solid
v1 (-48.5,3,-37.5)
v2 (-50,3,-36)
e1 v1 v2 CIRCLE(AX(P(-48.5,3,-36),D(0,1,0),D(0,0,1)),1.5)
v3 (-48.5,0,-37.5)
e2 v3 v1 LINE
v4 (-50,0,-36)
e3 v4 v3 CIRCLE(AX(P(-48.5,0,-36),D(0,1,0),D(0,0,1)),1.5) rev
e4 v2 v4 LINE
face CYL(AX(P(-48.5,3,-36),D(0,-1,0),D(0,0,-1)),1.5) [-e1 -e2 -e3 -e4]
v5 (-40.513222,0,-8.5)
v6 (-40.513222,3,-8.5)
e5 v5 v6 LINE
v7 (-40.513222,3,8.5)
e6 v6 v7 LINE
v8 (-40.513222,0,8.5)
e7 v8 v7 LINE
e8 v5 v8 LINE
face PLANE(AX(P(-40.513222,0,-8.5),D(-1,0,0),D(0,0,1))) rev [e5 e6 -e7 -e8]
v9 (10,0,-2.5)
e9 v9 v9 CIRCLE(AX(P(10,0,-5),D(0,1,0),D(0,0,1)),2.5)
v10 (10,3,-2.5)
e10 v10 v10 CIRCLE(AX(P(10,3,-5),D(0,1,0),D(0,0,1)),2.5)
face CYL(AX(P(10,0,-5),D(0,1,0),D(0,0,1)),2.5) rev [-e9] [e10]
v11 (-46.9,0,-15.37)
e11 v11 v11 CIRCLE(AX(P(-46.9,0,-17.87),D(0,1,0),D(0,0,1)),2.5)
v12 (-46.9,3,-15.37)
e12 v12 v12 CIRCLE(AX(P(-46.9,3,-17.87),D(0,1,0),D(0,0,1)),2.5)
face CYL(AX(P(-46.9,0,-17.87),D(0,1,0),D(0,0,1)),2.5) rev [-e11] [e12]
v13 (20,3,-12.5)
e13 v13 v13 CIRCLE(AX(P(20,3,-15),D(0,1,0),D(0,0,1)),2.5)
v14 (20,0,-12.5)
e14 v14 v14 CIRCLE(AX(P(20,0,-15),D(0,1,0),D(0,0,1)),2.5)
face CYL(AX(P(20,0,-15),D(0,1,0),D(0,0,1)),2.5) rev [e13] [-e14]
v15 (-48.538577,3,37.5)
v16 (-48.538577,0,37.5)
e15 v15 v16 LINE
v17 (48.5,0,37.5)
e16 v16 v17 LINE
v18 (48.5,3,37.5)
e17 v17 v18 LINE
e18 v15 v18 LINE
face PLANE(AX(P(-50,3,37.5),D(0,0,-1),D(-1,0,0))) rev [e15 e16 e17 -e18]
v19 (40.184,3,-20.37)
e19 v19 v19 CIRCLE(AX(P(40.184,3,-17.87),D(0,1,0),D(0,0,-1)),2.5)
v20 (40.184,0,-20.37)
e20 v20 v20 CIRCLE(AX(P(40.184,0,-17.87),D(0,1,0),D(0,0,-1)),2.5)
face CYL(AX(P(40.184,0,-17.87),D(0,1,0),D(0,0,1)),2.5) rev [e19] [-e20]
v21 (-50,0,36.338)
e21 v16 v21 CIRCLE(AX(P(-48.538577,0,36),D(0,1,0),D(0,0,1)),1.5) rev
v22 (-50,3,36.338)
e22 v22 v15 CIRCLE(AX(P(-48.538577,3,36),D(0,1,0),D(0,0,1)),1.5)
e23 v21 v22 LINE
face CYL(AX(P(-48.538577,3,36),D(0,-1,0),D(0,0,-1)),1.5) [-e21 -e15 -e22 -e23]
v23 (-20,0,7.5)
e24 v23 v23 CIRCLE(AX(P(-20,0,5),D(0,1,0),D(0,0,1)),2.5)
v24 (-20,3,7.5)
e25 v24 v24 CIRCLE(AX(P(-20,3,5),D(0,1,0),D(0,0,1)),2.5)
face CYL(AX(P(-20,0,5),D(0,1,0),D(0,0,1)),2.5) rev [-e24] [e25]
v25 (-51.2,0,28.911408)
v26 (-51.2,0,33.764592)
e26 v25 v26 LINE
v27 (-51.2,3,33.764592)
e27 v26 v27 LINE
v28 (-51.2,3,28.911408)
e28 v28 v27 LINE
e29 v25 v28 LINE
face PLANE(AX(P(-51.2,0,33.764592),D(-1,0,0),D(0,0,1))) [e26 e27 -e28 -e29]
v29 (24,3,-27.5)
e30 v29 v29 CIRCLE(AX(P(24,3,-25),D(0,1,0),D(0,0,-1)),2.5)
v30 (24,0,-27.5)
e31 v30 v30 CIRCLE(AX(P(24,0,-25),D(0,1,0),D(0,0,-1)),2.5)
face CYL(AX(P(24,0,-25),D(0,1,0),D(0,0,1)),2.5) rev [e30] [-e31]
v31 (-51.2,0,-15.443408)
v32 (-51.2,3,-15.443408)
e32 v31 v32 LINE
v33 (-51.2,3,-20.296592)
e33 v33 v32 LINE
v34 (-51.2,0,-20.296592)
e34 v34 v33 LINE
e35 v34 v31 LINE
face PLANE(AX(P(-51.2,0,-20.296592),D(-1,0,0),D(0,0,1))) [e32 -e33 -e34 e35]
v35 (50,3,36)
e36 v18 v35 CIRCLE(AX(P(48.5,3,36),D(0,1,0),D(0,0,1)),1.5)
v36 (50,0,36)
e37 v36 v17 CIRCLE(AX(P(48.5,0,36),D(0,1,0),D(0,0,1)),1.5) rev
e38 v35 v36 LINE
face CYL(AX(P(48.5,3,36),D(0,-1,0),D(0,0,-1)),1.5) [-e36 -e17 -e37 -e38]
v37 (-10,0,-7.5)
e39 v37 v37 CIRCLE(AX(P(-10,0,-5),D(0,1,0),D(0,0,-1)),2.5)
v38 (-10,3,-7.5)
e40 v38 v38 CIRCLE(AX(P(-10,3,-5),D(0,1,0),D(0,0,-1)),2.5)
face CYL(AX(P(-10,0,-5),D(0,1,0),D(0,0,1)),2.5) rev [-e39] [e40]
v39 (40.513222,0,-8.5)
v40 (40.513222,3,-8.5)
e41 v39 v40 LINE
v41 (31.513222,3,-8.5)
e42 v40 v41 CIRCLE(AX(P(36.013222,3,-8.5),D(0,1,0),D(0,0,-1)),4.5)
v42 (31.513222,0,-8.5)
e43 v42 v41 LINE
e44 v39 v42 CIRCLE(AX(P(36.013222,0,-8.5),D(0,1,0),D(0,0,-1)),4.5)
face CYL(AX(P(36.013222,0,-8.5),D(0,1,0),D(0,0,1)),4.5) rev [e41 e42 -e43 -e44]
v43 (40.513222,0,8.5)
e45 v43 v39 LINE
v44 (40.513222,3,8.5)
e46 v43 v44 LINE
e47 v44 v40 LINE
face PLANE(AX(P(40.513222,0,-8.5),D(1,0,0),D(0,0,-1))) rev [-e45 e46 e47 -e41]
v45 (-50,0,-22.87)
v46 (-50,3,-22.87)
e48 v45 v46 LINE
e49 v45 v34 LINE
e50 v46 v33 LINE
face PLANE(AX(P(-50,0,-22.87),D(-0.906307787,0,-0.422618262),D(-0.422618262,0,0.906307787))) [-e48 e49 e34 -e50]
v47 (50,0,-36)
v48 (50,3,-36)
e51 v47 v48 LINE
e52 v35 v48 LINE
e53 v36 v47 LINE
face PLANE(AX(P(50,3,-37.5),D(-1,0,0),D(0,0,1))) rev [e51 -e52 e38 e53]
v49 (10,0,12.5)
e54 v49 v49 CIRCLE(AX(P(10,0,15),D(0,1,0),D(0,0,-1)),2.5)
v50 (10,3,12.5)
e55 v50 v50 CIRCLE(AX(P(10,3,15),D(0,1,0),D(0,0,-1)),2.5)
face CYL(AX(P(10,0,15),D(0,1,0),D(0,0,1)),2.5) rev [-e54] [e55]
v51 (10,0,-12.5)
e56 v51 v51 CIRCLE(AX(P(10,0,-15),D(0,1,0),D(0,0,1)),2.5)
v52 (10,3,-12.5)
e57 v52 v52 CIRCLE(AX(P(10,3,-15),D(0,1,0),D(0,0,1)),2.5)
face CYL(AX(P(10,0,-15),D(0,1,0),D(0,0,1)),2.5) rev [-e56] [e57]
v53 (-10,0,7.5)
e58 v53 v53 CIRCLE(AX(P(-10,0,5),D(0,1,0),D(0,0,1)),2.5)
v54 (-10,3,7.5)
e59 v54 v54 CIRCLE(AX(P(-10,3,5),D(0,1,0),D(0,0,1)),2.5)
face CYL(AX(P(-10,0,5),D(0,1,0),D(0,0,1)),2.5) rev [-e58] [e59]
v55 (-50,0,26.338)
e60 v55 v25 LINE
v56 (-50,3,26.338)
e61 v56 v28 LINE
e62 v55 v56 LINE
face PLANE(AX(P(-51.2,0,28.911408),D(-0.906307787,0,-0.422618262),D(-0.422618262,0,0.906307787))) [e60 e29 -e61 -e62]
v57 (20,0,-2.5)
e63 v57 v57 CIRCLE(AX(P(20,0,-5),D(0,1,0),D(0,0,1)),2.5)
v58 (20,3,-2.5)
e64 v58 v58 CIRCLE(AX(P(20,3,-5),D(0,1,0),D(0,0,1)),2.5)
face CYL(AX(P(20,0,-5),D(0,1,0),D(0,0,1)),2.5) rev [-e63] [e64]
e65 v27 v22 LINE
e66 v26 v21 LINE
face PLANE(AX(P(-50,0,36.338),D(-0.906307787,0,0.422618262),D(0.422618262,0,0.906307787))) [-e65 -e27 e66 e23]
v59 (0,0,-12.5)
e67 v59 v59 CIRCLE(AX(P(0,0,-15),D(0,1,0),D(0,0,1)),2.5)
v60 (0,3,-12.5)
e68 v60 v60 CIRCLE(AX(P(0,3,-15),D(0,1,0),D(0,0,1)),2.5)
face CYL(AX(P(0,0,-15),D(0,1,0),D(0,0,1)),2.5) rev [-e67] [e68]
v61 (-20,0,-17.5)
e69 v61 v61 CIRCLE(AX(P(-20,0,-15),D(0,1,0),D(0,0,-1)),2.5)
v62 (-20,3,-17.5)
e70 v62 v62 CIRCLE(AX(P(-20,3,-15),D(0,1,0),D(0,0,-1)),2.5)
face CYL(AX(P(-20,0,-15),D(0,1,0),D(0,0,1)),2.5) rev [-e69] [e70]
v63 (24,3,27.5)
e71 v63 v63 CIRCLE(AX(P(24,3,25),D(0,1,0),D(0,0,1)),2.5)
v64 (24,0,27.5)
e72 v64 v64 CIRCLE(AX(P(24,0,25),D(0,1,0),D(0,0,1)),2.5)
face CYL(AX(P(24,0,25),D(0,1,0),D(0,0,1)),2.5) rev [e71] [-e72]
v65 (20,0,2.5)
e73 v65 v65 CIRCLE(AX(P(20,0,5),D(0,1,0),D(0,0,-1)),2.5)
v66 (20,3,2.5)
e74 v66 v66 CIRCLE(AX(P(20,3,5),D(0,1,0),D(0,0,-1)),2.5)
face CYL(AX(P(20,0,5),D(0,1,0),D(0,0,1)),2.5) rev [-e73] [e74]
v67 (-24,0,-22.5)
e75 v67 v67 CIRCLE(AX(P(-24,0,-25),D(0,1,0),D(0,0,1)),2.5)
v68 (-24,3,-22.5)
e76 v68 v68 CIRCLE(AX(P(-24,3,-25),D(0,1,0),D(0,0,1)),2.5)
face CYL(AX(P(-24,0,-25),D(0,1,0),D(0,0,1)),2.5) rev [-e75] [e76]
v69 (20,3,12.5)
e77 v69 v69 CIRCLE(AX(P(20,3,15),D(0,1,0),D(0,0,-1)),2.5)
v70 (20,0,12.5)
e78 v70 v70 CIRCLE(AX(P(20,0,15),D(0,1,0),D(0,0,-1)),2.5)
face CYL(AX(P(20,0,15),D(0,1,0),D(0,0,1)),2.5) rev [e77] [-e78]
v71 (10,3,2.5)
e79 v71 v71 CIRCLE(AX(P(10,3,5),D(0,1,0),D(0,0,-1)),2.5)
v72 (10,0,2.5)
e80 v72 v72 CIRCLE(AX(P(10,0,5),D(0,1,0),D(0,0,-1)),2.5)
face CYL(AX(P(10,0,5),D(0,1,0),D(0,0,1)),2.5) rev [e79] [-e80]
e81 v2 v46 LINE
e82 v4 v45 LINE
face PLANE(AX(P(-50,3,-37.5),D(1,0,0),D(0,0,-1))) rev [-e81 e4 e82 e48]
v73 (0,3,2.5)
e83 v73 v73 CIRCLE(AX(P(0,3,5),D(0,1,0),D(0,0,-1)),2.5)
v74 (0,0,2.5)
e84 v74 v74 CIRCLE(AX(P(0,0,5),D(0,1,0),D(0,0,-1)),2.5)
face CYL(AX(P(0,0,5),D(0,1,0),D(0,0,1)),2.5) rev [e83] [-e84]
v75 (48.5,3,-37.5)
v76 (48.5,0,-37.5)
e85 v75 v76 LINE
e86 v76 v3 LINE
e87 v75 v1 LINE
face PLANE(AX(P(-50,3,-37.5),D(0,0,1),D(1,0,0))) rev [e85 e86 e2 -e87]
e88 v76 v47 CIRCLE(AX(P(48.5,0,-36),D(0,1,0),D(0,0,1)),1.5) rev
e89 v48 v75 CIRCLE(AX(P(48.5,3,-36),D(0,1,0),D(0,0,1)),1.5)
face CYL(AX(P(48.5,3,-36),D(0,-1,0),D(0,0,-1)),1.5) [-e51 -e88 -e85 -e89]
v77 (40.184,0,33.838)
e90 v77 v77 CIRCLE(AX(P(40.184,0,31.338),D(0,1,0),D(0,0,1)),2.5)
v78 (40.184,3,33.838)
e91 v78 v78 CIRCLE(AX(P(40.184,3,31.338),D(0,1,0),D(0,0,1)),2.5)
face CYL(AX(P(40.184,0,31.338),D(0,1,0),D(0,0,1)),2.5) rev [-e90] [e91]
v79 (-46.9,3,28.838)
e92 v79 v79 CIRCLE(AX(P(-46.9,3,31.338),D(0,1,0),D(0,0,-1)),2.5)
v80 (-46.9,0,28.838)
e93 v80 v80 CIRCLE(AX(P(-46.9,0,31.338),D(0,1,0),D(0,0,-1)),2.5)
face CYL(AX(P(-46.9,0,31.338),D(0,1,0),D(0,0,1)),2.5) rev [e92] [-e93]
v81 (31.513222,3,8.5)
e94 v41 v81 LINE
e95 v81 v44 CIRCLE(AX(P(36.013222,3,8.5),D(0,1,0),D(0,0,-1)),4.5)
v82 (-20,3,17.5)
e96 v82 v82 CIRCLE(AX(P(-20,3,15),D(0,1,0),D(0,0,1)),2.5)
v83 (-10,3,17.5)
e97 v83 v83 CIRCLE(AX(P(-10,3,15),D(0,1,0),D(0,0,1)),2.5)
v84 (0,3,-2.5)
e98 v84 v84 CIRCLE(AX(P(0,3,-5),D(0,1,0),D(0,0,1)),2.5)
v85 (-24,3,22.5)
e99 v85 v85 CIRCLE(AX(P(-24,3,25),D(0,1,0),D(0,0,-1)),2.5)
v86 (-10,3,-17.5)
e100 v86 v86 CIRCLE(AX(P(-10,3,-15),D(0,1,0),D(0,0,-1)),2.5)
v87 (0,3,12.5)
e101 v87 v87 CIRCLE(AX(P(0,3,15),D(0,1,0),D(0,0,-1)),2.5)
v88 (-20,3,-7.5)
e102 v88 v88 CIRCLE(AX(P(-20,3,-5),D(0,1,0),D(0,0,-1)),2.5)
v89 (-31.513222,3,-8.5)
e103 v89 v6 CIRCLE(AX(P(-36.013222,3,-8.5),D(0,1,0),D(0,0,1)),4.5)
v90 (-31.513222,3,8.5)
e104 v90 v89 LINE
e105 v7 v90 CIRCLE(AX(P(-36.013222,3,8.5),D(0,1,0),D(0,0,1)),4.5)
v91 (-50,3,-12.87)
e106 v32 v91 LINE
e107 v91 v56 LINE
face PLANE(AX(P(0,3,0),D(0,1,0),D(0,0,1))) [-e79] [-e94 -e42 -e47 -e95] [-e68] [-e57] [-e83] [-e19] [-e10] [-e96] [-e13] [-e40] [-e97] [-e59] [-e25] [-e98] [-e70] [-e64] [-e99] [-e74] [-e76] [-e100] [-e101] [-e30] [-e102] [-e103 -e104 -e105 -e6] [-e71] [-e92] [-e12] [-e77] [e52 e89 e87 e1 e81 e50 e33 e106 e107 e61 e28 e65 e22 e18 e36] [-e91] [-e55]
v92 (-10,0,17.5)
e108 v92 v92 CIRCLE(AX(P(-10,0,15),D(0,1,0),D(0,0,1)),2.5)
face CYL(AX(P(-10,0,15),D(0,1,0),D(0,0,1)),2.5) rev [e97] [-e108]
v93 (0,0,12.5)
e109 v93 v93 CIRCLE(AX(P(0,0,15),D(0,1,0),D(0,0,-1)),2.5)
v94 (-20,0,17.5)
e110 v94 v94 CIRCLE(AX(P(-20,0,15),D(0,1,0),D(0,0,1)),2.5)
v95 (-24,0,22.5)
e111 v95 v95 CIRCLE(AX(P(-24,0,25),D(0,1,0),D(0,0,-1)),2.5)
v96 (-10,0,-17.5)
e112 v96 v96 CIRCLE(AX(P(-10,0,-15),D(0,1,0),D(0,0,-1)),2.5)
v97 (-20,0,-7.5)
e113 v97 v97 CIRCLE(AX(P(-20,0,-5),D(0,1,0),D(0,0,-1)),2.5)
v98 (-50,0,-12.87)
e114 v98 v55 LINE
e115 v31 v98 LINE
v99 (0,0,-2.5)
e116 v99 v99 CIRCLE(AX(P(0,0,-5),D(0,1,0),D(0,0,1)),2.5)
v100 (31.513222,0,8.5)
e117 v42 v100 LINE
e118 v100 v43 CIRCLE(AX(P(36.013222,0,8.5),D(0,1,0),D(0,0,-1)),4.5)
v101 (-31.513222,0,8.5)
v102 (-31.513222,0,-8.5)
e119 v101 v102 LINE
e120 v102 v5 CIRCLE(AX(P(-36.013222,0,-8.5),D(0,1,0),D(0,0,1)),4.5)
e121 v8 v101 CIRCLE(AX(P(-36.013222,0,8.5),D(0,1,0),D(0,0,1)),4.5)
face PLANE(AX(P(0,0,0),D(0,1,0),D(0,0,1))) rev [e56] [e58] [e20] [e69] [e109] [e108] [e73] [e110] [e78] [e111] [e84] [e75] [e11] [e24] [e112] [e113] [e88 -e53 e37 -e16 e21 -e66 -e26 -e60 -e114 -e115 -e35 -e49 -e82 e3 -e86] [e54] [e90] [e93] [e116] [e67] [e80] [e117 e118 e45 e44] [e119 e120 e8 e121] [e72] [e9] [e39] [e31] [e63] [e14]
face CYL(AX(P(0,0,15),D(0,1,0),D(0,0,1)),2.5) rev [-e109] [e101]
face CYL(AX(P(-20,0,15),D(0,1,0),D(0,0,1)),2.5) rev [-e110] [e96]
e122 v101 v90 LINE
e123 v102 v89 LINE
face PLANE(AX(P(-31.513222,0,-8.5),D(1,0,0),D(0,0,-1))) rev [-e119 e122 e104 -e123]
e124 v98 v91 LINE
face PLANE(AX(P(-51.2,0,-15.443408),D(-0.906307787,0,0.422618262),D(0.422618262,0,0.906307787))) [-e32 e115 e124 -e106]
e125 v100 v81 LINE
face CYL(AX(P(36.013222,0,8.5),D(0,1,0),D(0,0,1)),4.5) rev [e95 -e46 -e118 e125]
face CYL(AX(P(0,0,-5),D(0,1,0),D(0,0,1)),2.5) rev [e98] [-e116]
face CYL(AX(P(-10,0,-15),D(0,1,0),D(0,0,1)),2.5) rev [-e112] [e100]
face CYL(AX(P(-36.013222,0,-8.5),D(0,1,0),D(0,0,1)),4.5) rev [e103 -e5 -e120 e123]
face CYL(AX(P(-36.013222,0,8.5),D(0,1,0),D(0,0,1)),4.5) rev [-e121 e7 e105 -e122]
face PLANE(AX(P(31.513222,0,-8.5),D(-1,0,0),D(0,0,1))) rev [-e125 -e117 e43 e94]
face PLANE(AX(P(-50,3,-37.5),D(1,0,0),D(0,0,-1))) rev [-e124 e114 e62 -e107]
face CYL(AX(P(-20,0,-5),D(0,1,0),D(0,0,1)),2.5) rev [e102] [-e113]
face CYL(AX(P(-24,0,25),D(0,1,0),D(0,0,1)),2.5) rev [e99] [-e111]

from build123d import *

# Parameters (mm, degrees)
SKETCH_1_W          = 100
SKETCH_1_H          = 75
EXTRUDE_1_DEPTH     = 3
SKETCH_2_R          = 2.5
CUT_EXTRUDE_1_DEPTH = 3
SKETCH_3_R          = 2.5
CUT_EXTRUDE_2_DEPTH = 3
EXTRUDE_2_DEPTH     = 3
FILLET_1_R          = 1.5


with BuildPart() as part:
    # 草图1 → 凸台-拉伸1 (new body)
    with BuildSketch(Plane(origin=(0, 0, 0), x_dir=(1, 0, 0), z_dir=(0, 1, 0))):
        Rectangle(SKETCH_1_W, SKETCH_1_H)
    extrude(amount=EXTRUDE_1_DEPTH)

    # 草图2 → 切除-拉伸1 (cut)
    with BuildSketch(Plane(origin=(0, 3, 0), x_dir=(1, 0, 0), z_dir=(0, 1, 0))):
        with Locations(Location((-46.9, 17.87, 0), (0, 0, 270))):
            Circle(SKETCH_2_R)
        with Locations(Location((-46.9, -31.338, 0), (0, 0, 90))):
            Circle(SKETCH_2_R)
        with Locations(Location((40.184, -31.338, 0), (0, 0, 270))):
            Circle(SKETCH_2_R)
        with Locations(Location((40.184, 17.87, 0), (0, 0, 90))):
            Circle(SKETCH_2_R)
    extrude(amount=-CUT_EXTRUDE_1_DEPTH, mode=Mode.SUBTRACT)

    # 草图3 → 切除-拉伸2 (cut)
    with BuildSketch(Plane(origin=(0, 3, 0), x_dir=(1, 0, 0), z_dir=(0, 1, 0))):
        with Locations(Location((-24, 25, 0), (0, 0, 270))):
            Circle(SKETCH_3_R)
        with Locations(Location((24, 25, 0), (0, 0, 90))):
            Circle(SKETCH_3_R)
        with Locations(Location((24, -25, 0), (0, 0, 270))):
            Circle(SKETCH_3_R)
        with Locations(Location((-24, -25, 0), (0, 0, 90))):
            Circle(SKETCH_3_R)
        with Locations(Location((0, 5, 0), (0, 0, 270))):
            Circle(SKETCH_3_R)
        with Locations(Location((0, 15, 0), (0, 0, 270))):
            Circle(SKETCH_3_R)
        with Locations(Location((0, -15, 0), (0, 0, 90))):
            Circle(SKETCH_3_R)
        with Locations(Location((0, -5, 0), (0, 0, 90))):
            Circle(SKETCH_3_R)
        with Locations(Location((10, 5, 0), (0, 0, 270))):
            Circle(SKETCH_3_R)
        with Locations(Location((10, 15, 0), (0, 0, 270))):
            Circle(SKETCH_3_R)
        with Locations(Location((10, -15, 0), (0, 0, 90))):
            Circle(SKETCH_3_R)
        with Locations(Location((10, -5, 0), (0, 0, 90))):
            Circle(SKETCH_3_R)
        with Locations(Location((20, 5, 0), (0, 0, 270))):
            Circle(SKETCH_3_R)
        with Locations(Location((20, 15, 0), (0, 0, 270))):
            Circle(SKETCH_3_R)
        with Locations(Location((20, -15, 0), (0, 0, 90))):
            Circle(SKETCH_3_R)
        with Locations(Location((20, -5, 0), (0, 0, 90))):
            Circle(SKETCH_3_R)
        with Locations(Location((-20, -5, 0), (0, 0, 270))):
            Circle(SKETCH_3_R)
        with Locations(Location((-20, -15, 0), (0, 0, 270))):
            Circle(SKETCH_3_R)
        with Locations(Location((-20, 15, 0), (0, 0, 90))):
            Circle(SKETCH_3_R)
        with Locations(Location((-20, 5, 0), (0, 0, 90))):
            Circle(SKETCH_3_R)
        with Locations(Location((-10, -5, 0), (0, 0, 270))):
            Circle(SKETCH_3_R)
        with Locations(Location((-10, -15, 0), (0, 0, 270))):
            Circle(SKETCH_3_R)
        with Locations(Location((-10, 15, 0), (0, 0, 90))):
            Circle(SKETCH_3_R)
        with Locations(Location((-10, 5, 0), (0, 0, 90))):
            Circle(SKETCH_3_R)
        with BuildLine():
            Line((-31.51322225, 8.5), (-31.51322225, -8.5))
            ThreePointArc((-31.51322225, -8.5), (-36.01322225, -13), (-40.51322225, -8.5))
            Line((-40.51322225, -8.5), (-40.51322225, 8.5))
            ThreePointArc((-40.51322225, 8.5), (-36.01322225, 13), (-31.51322225, 8.5))
        make_face()
        with BuildLine():
            Line((31.51322225, 8.5), (31.51322225, -8.5))
            ThreePointArc((31.51322225, -8.5), (36.01322225, -13), (40.51322225, -8.5))
            Line((40.51322225, -8.5), (40.51322225, 8.5))
            ThreePointArc((40.51322225, 8.5), (36.01322225, 13), (31.51322225, 8.5))
        make_face()
    extrude(amount=-CUT_EXTRUDE_2_DEPTH, mode=Mode.SUBTRACT)

    # 草图4 → 凸台-拉伸2 (add)
    with BuildSketch(Plane(origin=(0, 3, 0), x_dir=(1, 0, 0), z_dir=(0, 1, 0))):
        Polygon((-50, 22.87), (-51.2, 20.296591695), (-51.2, 15.443408305), (-50, 12.87), align=None)
        Polygon((-51.2, -28.911408305), (-50, -26.338), (-50, -36.338), (-51.2, -33.764591695), align=None)
    extrude(amount=-EXTRUDE_2_DEPTH)

    # 圆角1
    # the kernel refuses this fillet: 1.5 mm, written as the material it takes off along each edge
    with BuildSketch(Plane(origin=(50, -3.75, 37.5), x_dir=(0, 0, -1), z_dir=(0, 1, 0)), Plane(origin=(50, -3.75, -37.5), x_dir=(-1, 0, 0), z_dir=(0, 1, 0))) as fillet_1_piece_1:
        with BuildLine():
            CenterArc((FILLET_1_R, FILLET_1_R), FILLET_1_R, 180, 90)
            Line((0, FILLET_1_R), (-FILLET_1_R * 0.02, FILLET_1_R))
            Line((-FILLET_1_R * 0.02, FILLET_1_R), (-FILLET_1_R * 0.02, -FILLET_1_R * 0.02))
            Line((-FILLET_1_R * 0.02, -FILLET_1_R * 0.02), (FILLET_1_R, -FILLET_1_R * 0.02))
            Line((FILLET_1_R, -FILLET_1_R * 0.02), (FILLET_1_R, 0))
        make_face()
    extrude(amount=10.5, mode=Mode.SUBTRACT)
    with BuildSketch(Plane(origin=(-50, -3.653556486, 37.5), x_dir=(1, 0, 0), z_dir=(0, 1, 0))) as fillet_1_piece_2:
        with BuildLine():
            CenterArc((1.461422595, 1.5), FILLET_1_R, 193.02248013, 76.97751987)
            Line((0, 1.162), (-0.029228452, 1.15524))
            ThreePointArc((-0.029228452, 1.15524), (-0.03, 0.581), (-0.03, 0))
            Line((-0.03, 0), (0, -0.03))
            Line((0, -0.03), (1.461422595, -0.03))
            Line((1.461422595, -0.03), (1.461422595, 0))
        make_face()
    extrude(amount=10.307112973, mode=Mode.SUBTRACT)
    with BuildSketch(Plane(origin=(-50, -3.75, -37.5), x_dir=(1, 0, 0), z_dir=(0, 1, 0))) as fillet_1_piece_3:
        with BuildLine():
            CenterArc((FILLET_1_R, -FILLET_1_R), FILLET_1_R, 90, 90)
            Line((0, -FILLET_1_R), (-FILLET_1_R * 0.02, -FILLET_1_R))
            Line((-FILLET_1_R * 0.02, -FILLET_1_R), (-FILLET_1_R * 0.02, FILLET_1_R * 0.02))
            Line((-FILLET_1_R * 0.02, FILLET_1_R * 0.02), (FILLET_1_R, FILLET_1_R * 0.02))
            Line((FILLET_1_R, FILLET_1_R * 0.02), (FILLET_1_R, 0))
        make_face()
    extrude(amount=10.5, mode=Mode.SUBTRACT)


solid = part.part
